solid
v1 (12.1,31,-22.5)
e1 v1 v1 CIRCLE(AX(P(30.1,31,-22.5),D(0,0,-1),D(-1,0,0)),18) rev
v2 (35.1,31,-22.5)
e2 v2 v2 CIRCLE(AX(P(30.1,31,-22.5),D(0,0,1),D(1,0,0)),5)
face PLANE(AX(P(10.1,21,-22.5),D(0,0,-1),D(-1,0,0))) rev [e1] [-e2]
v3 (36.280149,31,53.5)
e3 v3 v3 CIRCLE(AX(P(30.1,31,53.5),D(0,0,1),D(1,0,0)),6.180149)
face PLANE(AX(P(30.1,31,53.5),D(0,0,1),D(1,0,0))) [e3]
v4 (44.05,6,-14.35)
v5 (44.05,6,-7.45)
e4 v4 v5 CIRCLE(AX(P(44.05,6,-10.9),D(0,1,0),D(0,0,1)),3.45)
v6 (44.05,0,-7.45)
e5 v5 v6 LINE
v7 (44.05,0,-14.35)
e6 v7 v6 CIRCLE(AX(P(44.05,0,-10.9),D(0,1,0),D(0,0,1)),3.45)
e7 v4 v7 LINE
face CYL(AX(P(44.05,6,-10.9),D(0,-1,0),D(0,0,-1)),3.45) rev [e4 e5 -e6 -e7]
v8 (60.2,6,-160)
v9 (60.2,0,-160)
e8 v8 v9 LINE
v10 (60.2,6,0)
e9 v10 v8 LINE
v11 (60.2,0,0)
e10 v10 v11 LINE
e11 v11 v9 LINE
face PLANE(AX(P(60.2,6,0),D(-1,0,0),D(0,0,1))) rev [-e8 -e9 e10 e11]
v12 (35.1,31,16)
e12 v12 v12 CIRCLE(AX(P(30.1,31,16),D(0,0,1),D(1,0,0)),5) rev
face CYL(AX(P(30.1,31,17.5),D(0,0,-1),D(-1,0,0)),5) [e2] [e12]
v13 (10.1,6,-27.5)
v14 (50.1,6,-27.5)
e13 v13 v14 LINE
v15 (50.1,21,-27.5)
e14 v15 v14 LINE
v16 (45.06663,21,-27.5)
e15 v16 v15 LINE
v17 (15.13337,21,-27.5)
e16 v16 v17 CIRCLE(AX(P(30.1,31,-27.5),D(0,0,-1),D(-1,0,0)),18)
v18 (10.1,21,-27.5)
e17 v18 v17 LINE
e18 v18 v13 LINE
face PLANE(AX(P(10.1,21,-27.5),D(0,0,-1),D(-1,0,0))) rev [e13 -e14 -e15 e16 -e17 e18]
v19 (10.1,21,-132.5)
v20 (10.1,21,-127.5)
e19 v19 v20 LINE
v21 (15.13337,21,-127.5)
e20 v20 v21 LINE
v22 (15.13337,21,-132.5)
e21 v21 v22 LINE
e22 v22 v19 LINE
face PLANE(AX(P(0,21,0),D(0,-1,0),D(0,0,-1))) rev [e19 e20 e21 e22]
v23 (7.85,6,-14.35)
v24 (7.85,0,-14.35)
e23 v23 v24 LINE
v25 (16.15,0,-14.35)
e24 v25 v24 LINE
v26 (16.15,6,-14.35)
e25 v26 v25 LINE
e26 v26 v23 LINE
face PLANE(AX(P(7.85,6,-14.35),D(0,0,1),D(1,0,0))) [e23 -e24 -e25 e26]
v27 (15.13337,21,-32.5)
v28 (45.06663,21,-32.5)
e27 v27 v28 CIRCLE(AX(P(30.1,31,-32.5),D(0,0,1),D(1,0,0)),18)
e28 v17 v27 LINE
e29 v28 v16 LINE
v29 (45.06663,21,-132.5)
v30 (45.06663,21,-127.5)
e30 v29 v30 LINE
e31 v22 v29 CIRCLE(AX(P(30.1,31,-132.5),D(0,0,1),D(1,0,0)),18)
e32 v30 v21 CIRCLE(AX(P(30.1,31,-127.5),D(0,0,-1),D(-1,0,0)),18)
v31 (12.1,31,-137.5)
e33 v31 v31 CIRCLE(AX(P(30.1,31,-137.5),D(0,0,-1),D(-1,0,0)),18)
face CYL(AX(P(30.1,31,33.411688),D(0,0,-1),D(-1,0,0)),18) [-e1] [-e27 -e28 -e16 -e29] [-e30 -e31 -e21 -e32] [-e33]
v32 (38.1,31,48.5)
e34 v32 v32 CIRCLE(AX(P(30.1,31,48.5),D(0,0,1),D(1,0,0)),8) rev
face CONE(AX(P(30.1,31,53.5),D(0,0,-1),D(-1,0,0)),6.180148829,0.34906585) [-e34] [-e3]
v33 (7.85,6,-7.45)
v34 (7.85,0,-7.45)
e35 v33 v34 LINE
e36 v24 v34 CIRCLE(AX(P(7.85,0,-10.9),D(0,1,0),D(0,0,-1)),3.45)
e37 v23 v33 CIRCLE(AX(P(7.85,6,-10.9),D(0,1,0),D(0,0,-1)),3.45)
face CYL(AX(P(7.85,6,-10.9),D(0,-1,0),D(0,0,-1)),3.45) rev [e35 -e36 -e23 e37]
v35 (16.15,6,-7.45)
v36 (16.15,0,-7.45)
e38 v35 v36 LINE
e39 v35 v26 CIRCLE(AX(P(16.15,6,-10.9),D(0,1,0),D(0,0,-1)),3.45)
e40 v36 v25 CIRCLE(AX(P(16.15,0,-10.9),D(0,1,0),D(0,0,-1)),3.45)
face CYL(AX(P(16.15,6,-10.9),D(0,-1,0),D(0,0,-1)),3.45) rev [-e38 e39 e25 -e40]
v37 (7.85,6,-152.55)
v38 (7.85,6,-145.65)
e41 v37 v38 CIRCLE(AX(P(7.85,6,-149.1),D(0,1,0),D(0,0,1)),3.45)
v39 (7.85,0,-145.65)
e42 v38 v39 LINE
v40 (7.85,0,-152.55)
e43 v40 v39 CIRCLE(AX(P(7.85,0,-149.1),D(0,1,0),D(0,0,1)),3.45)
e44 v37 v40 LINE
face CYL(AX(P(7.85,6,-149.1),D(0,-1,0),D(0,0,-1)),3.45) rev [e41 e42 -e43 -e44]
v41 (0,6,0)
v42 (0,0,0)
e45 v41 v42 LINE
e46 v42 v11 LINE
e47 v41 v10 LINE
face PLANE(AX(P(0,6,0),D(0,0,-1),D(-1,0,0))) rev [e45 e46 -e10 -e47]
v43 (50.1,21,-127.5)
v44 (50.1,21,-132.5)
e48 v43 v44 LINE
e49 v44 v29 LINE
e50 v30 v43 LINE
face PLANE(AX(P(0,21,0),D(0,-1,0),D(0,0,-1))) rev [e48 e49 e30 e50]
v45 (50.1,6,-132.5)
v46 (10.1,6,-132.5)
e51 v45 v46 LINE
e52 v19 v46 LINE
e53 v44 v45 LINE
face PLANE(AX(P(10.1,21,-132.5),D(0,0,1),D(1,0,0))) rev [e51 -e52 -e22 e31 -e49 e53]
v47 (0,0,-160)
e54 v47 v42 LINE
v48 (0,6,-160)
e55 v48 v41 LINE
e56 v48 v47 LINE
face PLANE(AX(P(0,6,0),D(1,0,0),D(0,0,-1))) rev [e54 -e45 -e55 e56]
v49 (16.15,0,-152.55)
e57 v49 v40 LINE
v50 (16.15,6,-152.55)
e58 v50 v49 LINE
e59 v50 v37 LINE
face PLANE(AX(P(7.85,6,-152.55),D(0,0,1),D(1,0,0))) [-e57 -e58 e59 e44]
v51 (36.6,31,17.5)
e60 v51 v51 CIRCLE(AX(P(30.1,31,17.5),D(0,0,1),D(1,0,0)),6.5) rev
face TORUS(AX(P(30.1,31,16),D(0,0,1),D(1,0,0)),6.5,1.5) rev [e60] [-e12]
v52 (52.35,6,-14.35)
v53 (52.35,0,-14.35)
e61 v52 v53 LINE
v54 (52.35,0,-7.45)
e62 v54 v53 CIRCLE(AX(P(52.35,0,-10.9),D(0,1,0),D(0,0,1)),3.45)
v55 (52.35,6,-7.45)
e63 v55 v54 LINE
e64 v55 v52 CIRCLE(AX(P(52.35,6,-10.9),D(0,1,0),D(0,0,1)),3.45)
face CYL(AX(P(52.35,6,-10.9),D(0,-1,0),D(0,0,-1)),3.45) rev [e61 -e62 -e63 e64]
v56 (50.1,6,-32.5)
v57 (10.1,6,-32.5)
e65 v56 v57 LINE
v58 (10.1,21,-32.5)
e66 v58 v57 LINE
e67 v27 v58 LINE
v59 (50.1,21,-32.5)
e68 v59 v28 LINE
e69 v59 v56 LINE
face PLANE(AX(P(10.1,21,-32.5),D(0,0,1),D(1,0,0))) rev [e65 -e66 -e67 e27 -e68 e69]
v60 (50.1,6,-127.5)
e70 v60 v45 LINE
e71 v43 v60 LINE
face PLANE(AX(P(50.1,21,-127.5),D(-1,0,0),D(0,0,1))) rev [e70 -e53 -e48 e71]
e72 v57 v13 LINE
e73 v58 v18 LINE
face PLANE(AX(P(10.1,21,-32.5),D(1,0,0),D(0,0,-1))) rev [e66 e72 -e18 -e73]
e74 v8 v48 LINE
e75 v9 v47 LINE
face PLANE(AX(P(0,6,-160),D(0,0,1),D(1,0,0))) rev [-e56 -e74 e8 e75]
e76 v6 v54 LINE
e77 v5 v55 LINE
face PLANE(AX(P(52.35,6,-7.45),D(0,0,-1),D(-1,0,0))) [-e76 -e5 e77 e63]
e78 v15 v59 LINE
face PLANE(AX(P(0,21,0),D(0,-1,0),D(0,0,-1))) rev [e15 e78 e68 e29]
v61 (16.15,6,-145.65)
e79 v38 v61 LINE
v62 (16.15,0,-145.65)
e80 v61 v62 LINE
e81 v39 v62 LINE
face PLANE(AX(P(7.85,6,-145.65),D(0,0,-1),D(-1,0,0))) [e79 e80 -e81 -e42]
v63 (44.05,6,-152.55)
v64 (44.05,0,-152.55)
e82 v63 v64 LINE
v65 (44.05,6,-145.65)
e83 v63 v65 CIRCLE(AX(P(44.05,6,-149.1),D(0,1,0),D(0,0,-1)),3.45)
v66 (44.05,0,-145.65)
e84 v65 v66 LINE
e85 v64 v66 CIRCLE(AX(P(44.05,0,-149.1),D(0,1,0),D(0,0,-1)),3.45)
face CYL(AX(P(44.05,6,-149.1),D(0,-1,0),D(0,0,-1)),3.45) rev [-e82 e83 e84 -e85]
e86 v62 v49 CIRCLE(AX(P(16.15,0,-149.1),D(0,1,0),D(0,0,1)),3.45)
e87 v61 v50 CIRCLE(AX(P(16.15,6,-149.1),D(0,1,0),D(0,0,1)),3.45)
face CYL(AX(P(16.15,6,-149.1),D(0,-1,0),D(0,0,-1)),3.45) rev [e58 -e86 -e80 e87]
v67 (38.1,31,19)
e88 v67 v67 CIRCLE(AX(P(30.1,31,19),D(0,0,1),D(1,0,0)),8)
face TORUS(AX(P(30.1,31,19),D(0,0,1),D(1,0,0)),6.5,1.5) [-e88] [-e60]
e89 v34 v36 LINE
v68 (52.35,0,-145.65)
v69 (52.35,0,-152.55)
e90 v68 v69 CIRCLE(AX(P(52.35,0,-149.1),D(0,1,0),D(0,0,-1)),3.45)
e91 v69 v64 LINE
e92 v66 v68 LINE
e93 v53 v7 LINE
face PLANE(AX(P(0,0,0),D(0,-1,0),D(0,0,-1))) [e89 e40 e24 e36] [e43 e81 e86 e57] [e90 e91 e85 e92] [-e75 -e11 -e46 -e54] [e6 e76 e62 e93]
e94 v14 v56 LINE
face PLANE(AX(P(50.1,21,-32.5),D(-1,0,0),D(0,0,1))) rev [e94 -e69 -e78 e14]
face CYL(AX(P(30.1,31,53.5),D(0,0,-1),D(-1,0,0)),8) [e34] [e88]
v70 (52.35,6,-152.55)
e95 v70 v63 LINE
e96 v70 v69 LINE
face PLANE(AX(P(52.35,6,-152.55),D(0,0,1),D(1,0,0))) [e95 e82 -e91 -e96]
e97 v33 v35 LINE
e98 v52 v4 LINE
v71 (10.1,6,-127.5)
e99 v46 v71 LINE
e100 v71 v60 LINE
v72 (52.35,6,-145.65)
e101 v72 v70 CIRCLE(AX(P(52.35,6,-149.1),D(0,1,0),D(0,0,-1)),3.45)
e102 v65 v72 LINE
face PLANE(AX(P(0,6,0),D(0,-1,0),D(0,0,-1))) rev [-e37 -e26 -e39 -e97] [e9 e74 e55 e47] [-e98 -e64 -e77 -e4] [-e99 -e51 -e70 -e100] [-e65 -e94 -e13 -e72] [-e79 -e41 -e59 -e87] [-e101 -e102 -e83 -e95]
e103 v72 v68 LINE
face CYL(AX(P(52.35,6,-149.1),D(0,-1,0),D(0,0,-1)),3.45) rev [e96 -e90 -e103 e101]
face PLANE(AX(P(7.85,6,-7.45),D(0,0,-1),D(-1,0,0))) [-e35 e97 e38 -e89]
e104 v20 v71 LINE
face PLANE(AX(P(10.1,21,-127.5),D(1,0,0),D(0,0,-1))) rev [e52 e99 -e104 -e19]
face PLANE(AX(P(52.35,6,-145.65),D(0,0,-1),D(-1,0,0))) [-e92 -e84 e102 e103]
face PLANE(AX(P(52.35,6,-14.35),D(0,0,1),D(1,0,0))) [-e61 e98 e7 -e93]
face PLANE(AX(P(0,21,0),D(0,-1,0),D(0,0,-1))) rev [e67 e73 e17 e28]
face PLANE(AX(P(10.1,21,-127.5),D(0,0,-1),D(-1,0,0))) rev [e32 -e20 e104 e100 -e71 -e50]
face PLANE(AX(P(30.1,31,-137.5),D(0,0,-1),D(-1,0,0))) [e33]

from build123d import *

# Parameters (mm, degrees)
SKETCH1_W                = 60.2
SKETCH1_H                = 160
BOSS_EXTRUDE1_DEPTH      = 6
SKETCH3_W                = 40
SKETCH3_H                = 5
BOSS_EXTRUDE2_DEPTH      = 15
BOSS_EXTRUDE3_DEPTH      = 5
BOSS_EXTRUDE3_DEPTH_BACK = 110
SKETCH4_R                = 18
SKETCH5_R                = 5
BOSS_EXTRUDE4_DEPTH      = 40
SKETCH6_R                = 8
BOSS_EXTRUDE5_DEPTH      = 36
CHAMFER1_SIZE            = 5
CHAMFER1_SIZE2           = 1.819851171
FILLET1_R                = 1.5


with BuildPart() as part:
    # Sketch1 → Boss-Extrude1 (new body)
    with BuildSketch(Plane(origin=(0, 0, 0), x_dir=(1, 0, 0), z_dir=(0, 1, 0))):
        with Locations((30.1, 80)):
            Rectangle(SKETCH1_W, SKETCH1_H)
        with BuildLine():
            Line((7.85, 152.55), (16.15, 152.55))
            ThreePointArc((16.15, 152.55), (19.6, 149.1), (16.15, 145.65))
            Line((16.15, 145.65), (7.85, 145.65))
            ThreePointArc((7.85, 145.65), (4.4, 149.1), (7.85, 152.55))
        make_face(mode=Mode.SUBTRACT)
        with BuildLine():
            Line((52.35, 145.65), (44.05, 145.65))
            ThreePointArc((44.05, 145.65), (40.6, 149.1), (44.05, 152.55))
            Line((44.05, 152.55), (52.35, 152.55))
            ThreePointArc((52.35, 152.55), (55.8, 149.1), (52.35, 145.65))
        make_face(mode=Mode.SUBTRACT)
        with BuildLine():
            Line((52.35, 7.45), (44.05, 7.45))
            ThreePointArc((44.05, 7.45), (40.6, 10.9), (44.05, 14.35))
            Line((44.05, 14.35), (52.35, 14.35))
            ThreePointArc((52.35, 14.35), (55.8, 10.9), (52.35, 7.45))
        make_face(mode=Mode.SUBTRACT)
        with BuildLine():
            Line((7.85, 14.35), (16.15, 14.35))
            ThreePointArc((16.15, 14.35), (19.6, 10.9), (16.15, 7.45))
            Line((16.15, 7.45), (7.85, 7.45))
            ThreePointArc((7.85, 7.45), (4.4, 10.9), (7.85, 14.35))
        make_face(mode=Mode.SUBTRACT)
    extrude(amount=BOSS_EXTRUDE1_DEPTH)

    # Sketch3 → Boss-Extrude2 (add)
    with BuildSketch(Plane(origin=(0, 6, 0), x_dir=(1, 0, 0), z_dir=(0, 1, 0))):
        with Locations((30.1, 130)):
            Rectangle(SKETCH3_W, SKETCH3_H)
        with Locations((30.1, 30)):
            Rectangle(SKETCH3_W, SKETCH3_H)
    extrude(amount=BOSS_EXTRUDE2_DEPTH)

    # Sketch4 → Boss-Extrude3 (add, two sides: drawn at the far end of the back side and taken through both)
    with BuildSketch(Plane(origin=(0, 0, -132.5), x_dir=(-1, 0, 0), z_dir=(0, 0, -1)).offset(-BOSS_EXTRUDE3_DEPTH_BACK)):
        with Locations((-30.1, 31)):
            Circle(SKETCH4_R)
    extrude(amount=BOSS_EXTRUDE3_DEPTH + BOSS_EXTRUDE3_DEPTH_BACK)

    # Sketch5 → Boss-Extrude4 (add)
    with BuildSketch(Plane.XY.offset(-22.5)):
        with Locations((30.1, 31)):
            Circle(SKETCH5_R)
    extrude(amount=BOSS_EXTRUDE4_DEPTH)

    # Sketch6 → Boss-Extrude5 (add)
    with BuildSketch(Plane.XY.offset(17.5)):
        with Locations((30.1, 31)):
            Circle(SKETCH6_R)
    extrude(amount=BOSS_EXTRUDE5_DEPTH)

    # Chamfer1
    chamfer1_edges = [part.edges().sort_by_distance(p)[0] for p in [
        (22.1, 31, 53.5),
    ]]
    chamfer1_side = [part.faces().sort_by_distance(p)[0] for p in [
        (22.1, 31, 35.5),
    ]]
    chamfer(chamfer1_edges, length=CHAMFER1_SIZE, length2=CHAMFER1_SIZE2, reference=chamfer1_side[0])

    # Fillet1
    fillet1_edges = [part.edges().sort_by_distance(p)[0] for p in [
        (25.1, 31, 17.5),
        (22.1, 31, 17.5),
    ]]
    fillet(fillet1_edges, radius=FILLET1_R - 0.0001)  # a hair under: the kernel refuses the full size


solid = part.part
